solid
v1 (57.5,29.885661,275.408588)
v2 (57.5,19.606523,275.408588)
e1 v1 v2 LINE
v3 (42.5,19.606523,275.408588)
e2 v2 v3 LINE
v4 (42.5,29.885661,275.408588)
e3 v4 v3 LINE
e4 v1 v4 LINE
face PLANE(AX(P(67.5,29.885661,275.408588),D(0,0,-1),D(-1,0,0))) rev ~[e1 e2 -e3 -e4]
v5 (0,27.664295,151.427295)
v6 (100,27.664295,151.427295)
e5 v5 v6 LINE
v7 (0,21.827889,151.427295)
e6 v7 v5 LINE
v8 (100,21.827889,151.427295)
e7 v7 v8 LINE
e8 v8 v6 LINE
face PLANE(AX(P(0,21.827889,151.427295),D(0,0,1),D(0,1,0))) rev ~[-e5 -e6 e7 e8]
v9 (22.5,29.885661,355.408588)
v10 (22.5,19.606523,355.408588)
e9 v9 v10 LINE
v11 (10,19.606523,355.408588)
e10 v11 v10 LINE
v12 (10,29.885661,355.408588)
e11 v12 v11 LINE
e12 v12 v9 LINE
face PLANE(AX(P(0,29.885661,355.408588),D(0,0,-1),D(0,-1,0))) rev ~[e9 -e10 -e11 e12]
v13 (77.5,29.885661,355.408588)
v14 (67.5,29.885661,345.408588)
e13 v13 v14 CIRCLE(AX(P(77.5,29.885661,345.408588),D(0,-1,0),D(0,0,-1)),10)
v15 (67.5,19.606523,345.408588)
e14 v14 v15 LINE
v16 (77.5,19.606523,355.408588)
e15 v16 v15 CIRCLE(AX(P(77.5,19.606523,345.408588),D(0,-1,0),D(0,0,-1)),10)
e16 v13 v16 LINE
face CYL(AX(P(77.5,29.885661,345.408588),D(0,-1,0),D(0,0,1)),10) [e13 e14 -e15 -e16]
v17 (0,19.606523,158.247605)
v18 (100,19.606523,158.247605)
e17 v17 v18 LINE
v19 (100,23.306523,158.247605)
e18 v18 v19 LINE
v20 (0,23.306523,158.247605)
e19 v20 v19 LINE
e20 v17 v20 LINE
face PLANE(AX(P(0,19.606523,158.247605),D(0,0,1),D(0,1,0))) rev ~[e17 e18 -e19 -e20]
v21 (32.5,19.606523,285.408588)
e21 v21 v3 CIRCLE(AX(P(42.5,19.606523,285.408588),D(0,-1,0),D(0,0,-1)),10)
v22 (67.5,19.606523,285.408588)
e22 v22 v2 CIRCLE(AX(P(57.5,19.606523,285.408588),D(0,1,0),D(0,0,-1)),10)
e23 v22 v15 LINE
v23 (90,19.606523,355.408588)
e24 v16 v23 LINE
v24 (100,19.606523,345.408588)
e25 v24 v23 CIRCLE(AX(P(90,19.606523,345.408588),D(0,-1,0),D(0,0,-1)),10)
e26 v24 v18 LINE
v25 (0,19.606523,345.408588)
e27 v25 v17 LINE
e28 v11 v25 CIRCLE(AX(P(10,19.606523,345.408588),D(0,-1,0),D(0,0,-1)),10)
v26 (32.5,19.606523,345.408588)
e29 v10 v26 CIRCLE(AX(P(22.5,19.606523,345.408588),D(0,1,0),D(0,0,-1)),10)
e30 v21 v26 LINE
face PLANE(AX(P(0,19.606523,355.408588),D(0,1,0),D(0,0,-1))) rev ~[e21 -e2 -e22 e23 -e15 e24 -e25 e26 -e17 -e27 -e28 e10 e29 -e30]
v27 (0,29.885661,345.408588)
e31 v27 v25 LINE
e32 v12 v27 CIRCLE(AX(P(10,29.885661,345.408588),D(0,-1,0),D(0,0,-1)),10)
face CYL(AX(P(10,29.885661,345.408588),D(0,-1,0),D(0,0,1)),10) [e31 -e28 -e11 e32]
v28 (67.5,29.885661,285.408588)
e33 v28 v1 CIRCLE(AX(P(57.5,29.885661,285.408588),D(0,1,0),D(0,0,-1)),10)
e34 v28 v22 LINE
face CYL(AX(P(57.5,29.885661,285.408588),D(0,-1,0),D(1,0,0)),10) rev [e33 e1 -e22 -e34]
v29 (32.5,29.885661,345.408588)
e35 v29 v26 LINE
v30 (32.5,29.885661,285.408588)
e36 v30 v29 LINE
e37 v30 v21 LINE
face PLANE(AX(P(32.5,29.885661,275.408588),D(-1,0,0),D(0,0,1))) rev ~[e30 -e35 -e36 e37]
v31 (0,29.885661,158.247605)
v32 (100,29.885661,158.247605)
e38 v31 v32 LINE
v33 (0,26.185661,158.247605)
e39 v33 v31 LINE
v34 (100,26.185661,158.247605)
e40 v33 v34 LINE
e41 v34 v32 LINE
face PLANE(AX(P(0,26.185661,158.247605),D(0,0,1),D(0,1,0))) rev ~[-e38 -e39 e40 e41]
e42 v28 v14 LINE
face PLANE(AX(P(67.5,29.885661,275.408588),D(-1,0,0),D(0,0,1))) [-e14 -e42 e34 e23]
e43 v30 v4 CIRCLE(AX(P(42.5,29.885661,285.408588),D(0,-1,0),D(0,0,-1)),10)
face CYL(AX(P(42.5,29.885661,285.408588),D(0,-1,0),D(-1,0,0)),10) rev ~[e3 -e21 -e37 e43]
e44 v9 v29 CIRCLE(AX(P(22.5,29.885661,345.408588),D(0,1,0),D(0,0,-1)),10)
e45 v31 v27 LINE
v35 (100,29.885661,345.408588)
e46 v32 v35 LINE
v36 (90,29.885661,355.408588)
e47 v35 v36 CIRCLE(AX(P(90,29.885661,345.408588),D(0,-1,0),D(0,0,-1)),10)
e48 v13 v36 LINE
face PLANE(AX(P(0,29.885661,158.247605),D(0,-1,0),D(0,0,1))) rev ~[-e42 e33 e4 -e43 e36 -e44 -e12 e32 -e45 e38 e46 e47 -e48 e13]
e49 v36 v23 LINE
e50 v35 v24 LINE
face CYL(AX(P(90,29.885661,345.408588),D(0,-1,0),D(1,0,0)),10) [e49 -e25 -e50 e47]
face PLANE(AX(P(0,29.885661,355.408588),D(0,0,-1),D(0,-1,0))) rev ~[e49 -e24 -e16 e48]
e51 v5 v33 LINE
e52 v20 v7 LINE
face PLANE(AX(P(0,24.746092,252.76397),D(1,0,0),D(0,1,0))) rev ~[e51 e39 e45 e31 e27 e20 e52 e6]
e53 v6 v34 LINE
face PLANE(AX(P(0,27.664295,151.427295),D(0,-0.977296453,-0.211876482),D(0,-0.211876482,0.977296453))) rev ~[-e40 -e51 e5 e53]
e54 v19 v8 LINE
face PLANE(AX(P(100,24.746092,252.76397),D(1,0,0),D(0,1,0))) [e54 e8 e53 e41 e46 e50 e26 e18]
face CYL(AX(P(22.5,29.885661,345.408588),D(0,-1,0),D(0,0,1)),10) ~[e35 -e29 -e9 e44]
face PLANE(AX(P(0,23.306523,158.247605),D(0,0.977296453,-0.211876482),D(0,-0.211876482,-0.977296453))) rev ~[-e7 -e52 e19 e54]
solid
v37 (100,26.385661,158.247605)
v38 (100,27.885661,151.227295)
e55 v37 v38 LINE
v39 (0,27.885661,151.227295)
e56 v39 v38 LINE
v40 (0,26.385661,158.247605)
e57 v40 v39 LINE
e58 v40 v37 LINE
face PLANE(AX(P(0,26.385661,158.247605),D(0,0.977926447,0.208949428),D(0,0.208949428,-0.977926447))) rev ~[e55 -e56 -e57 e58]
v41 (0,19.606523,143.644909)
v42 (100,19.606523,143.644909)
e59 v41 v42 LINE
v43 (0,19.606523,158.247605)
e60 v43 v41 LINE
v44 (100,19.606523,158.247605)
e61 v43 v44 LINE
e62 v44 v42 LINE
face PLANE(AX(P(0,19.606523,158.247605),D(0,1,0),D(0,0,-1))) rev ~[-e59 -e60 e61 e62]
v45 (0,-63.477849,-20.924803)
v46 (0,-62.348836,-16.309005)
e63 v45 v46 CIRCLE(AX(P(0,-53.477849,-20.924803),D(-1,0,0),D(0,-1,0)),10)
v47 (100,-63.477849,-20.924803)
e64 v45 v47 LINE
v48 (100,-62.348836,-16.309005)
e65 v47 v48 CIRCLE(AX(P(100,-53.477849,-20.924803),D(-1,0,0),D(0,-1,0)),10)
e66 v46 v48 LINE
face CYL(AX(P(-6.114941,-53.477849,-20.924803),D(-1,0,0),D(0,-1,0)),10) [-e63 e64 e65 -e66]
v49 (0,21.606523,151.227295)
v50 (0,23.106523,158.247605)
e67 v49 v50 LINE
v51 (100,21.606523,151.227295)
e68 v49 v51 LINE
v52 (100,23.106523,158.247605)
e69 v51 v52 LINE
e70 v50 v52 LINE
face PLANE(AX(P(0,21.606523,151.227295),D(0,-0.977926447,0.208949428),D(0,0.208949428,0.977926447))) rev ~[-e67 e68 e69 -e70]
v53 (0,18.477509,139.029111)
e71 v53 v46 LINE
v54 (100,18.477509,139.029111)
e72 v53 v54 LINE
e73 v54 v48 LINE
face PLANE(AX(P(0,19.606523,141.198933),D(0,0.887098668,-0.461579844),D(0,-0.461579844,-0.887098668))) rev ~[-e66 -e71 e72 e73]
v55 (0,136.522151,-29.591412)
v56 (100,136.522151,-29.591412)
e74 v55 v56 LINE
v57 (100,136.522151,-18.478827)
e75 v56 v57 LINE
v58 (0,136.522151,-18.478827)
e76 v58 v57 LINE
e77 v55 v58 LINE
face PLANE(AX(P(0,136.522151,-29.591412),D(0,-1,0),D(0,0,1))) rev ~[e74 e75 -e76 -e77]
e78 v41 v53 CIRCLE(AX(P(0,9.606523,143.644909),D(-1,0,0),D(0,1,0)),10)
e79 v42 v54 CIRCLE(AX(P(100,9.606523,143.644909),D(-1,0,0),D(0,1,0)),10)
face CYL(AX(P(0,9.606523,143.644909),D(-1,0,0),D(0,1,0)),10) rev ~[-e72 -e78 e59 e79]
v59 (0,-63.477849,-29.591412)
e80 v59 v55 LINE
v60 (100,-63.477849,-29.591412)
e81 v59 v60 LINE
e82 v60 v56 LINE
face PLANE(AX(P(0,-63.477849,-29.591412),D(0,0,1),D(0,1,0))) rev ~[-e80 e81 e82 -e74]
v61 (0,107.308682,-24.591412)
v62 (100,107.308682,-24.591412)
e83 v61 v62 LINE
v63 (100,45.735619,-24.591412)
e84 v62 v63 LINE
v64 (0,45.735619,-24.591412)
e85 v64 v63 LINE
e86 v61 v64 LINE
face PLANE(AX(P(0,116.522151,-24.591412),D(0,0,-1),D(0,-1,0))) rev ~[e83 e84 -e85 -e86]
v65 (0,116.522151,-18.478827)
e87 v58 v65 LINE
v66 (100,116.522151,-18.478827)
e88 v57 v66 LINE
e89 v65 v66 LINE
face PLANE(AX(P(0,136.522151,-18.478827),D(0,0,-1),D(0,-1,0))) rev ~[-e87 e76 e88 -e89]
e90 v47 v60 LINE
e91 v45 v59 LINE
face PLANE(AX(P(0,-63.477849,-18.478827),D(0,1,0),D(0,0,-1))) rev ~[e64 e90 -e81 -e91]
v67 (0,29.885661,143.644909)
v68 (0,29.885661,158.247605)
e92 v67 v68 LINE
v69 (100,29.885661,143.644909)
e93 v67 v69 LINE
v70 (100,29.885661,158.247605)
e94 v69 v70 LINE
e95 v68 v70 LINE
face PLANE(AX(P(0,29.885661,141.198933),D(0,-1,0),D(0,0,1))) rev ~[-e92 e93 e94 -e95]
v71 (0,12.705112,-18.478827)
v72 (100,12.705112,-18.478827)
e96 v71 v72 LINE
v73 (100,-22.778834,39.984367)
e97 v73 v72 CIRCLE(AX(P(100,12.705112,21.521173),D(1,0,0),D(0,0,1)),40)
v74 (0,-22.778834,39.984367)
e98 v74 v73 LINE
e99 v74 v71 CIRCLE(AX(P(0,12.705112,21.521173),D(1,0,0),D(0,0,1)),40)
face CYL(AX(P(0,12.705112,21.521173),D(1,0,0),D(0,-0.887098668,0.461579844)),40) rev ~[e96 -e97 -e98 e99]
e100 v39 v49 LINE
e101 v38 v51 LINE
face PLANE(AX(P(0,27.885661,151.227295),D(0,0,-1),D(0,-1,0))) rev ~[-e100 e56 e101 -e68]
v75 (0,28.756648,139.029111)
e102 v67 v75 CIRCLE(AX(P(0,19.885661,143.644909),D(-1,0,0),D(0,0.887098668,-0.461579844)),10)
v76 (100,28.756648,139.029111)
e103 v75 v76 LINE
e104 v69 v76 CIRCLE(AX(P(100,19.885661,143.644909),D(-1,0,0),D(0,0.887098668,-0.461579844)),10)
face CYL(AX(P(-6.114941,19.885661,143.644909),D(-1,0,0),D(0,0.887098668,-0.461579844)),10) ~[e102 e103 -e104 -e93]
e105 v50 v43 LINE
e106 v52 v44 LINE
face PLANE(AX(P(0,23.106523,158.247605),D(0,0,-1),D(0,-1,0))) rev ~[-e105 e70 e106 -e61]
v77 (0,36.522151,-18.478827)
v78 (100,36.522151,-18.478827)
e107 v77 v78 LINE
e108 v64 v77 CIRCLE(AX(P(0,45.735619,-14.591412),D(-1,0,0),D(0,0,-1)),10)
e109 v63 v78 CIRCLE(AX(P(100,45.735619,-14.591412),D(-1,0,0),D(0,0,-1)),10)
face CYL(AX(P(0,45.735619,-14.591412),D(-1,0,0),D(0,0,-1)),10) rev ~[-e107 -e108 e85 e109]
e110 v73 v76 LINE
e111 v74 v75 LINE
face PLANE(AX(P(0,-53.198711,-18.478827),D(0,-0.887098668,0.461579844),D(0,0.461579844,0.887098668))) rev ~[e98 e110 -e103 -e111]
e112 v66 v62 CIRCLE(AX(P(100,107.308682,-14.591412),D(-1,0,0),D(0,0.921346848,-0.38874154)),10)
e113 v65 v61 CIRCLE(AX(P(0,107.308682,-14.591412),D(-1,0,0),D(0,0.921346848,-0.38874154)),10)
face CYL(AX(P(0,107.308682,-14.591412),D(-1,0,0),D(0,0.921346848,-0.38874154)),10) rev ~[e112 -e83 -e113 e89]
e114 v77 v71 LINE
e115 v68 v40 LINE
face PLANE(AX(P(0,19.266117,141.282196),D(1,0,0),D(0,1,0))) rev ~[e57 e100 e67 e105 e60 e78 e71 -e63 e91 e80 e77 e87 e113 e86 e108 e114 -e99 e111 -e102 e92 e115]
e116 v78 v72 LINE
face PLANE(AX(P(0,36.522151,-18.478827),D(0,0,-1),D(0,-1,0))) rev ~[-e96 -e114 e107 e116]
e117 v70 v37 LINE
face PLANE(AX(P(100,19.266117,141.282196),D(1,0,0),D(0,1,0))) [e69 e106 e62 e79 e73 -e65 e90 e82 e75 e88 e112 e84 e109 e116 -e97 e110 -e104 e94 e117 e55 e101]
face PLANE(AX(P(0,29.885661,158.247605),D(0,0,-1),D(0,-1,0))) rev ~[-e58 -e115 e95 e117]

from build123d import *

# Parameters (mm, degrees)
F1_DEPTH    = 100
F2_T1_DEPTH = 100
F2_T3_DEPTH = 100
F2_T5_DEPTH = 100
F2_T7_DEPTH = 112.2298810339
F2_T9_DEPTH = 112.2298810339
F4_DEPTH    = 100
F5_W        = 35
F5_H        = 80
F6_DEPTH    = 25
F7_R        = 10
F8_R        = 40


# Not quite as in the source:
# - a fillet or chamfer that OpenCascade refuses, or shapes differently, is made with other operations: its cross-section is extruded or revolved along the edge and cut away or added


with BuildPart() as f1:
    # F0 (on Right) → F1 (new body)
    with BuildSketch(Plane.YZ):
        Polygon((136.5221505807, -29.5914116513), (136.5221505807, -18.4788270524), (116.5221505807, -18.4788270524), (116.5221505807, -24.5914116513), (36.5221505807, -24.5914116513), (36.5221505807, -18.4788270524), (-53.1987108176, -18.4788270524), (-63.4778494193, -18.4788270524), (-63.4778494193, -29.5914116513), align=None)
        Polygon((19.6065225478, 158.2476049662), (19.6065225478, 141.1989332489), (29.8856611494, 141.1989332489), (29.8856611494, 158.2476049662), (26.3856611494, 158.2476049662), (27.8856611494, 151.2272953987), (21.6065225478, 151.2272953987), (23.1065225478, 158.2476049662), align=None)
        Polygon((19.6065225478, 141.1989332489), (-63.4778494193, -18.4788270524), (-53.1987108176, -18.4788270524), (29.8856611494, 141.1989332489), align=None)
    extrude(amount=F1_DEPTH)

    # F2: fillet of radius 10 on 5 edges, made by hand

    # F2_s2 → F2_t1 (join)
    with BuildSketch(Plane.YZ):
        with BuildLine():
            ThreePointArc((116.5221505807, -18.4788270524), (112.8370564508, -22.9243029266), (107.3086820971, -24.5914116513))
            Line((107.3086820971, -24.5914116513), (116.5221505807, -24.5914116513))
            Line((116.5221505807, -24.5914116513), (116.5221505807, -18.4788270524))
        make_face()
    extrude(amount=F2_T1_DEPTH)

    # F2_s4 → F2_t3 (join)
    with BuildSketch(Plane.YZ):
        with BuildLine():
            ThreePointArc((45.7356190644, -24.5914116513), (40.2072447107, -22.9243029266), (36.5221505807, -18.4788270524))
            Line((36.5221505807, -18.4788270524), (36.5221505807, -24.5914116513))
            Line((36.5221505807, -24.5914116513), (45.7356190644, -24.5914116513))
        make_face()
    extrude(amount=F2_T3_DEPTH)

    # F2_s6 → F2_t5 (join)
    with BuildSketch(Plane.YZ):
        with BuildLine():
            ThreePointArc((19.6065225478, 143.6449094556), (19.3201693098, 141.2689745696), (18.4775092312, 139.029111013))
            Line((18.4775092312, 139.029111013), (19.6065225478, 141.1989332489))
            Line((19.6065225478, 141.1989332489), (19.6065225478, 143.6449094556))
        make_face()
    extrude(amount=F2_T5_DEPTH)

    # F2_s8 → F2_t7 (cut)
    with BuildSketch(Plane.YZ.offset(-6.114940517)):
        with BuildLine():
            ThreePointArc((28.7566478328, 139.029111013), (29.5993079114, 141.2689745696), (29.8856611494, 143.6449094556))
            Line((29.8856611494, 143.6449094556), (29.8856611494, 141.1989332489))
            Line((29.8856611494, 141.1989332489), (28.7566478328, 139.029111013))
        make_face()
    extrude(amount=F2_T7_DEPTH, mode=Mode.SUBTRACT)

    # F2_s10 → F2_t9 (cut)
    with BuildSketch(Plane.YZ.offset(-6.114940517)):
        with BuildLine():
            ThreePointArc((-63.4778494193, -20.9248032592), (-63.1914961813, -18.5488683731), (-62.3488361027, -16.3090048166))
            Line((-62.3488361027, -16.3090048166), (-63.4778494193, -18.4788270524))
            Line((-63.4778494193, -18.4788270524), (-63.4778494193, -20.9248032592))
        make_face()
    extrude(amount=F2_T9_DEPTH, mode=Mode.SUBTRACT)

    # F8
    f8_edges = [f1.edges().sort_by_distance(p)[0] for p in [
        (50, -53.198711, -18.478827),
    ]]
    fillet(f8_edges, radius=F8_R)


with BuildPart() as f4:
    # F3 (on face) → F4 (new body)
    with BuildSketch(Plane.YZ):
        Polygon((29.8856611494, 355.4085883487), (19.6065225478, 355.4085883487), (19.6065225478, 158.2476049662), (23.1065225478, 158.2476049662), (23.3065225478, 158.2476049662), (21.8278891269, 151.4272953987), (24.5640873909, 151.4272953987), (27.6642945703, 151.4272953987), (26.1856611494, 158.2476049662), (26.3856611494, 158.2476049662), (29.8856611494, 158.2476049662), align=None)
    extrude(amount=F4_DEPTH)

    # F5 (on face) → F6 (cut)
    with BuildSketch(Plane(origin=(0, 29.8856611494, 0), x_dir=(-1, 0, 0), z_dir=(0, 1, 0))):
        with Locations((-50, 315.4085883487)):
            Rectangle(F5_W, F5_H)
    extrude(amount=-F6_DEPTH, mode=Mode.SUBTRACT)

    # F7
    f7_edges = [f4.edges().sort_by_distance(p)[0] for p in [
        (32.5, 24.746092, 275.408588),
        (67.5, 24.746092, 275.408588),
        (32.5, 24.746092, 355.408588),
        (67.5, 24.746092, 355.408588),
        (100, 24.746092, 355.408588),
        (0, 24.746092, 355.408588),
    ]]
    fillet(f7_edges, radius=F7_R)


solid = Compound([f1.part, f4.part])
